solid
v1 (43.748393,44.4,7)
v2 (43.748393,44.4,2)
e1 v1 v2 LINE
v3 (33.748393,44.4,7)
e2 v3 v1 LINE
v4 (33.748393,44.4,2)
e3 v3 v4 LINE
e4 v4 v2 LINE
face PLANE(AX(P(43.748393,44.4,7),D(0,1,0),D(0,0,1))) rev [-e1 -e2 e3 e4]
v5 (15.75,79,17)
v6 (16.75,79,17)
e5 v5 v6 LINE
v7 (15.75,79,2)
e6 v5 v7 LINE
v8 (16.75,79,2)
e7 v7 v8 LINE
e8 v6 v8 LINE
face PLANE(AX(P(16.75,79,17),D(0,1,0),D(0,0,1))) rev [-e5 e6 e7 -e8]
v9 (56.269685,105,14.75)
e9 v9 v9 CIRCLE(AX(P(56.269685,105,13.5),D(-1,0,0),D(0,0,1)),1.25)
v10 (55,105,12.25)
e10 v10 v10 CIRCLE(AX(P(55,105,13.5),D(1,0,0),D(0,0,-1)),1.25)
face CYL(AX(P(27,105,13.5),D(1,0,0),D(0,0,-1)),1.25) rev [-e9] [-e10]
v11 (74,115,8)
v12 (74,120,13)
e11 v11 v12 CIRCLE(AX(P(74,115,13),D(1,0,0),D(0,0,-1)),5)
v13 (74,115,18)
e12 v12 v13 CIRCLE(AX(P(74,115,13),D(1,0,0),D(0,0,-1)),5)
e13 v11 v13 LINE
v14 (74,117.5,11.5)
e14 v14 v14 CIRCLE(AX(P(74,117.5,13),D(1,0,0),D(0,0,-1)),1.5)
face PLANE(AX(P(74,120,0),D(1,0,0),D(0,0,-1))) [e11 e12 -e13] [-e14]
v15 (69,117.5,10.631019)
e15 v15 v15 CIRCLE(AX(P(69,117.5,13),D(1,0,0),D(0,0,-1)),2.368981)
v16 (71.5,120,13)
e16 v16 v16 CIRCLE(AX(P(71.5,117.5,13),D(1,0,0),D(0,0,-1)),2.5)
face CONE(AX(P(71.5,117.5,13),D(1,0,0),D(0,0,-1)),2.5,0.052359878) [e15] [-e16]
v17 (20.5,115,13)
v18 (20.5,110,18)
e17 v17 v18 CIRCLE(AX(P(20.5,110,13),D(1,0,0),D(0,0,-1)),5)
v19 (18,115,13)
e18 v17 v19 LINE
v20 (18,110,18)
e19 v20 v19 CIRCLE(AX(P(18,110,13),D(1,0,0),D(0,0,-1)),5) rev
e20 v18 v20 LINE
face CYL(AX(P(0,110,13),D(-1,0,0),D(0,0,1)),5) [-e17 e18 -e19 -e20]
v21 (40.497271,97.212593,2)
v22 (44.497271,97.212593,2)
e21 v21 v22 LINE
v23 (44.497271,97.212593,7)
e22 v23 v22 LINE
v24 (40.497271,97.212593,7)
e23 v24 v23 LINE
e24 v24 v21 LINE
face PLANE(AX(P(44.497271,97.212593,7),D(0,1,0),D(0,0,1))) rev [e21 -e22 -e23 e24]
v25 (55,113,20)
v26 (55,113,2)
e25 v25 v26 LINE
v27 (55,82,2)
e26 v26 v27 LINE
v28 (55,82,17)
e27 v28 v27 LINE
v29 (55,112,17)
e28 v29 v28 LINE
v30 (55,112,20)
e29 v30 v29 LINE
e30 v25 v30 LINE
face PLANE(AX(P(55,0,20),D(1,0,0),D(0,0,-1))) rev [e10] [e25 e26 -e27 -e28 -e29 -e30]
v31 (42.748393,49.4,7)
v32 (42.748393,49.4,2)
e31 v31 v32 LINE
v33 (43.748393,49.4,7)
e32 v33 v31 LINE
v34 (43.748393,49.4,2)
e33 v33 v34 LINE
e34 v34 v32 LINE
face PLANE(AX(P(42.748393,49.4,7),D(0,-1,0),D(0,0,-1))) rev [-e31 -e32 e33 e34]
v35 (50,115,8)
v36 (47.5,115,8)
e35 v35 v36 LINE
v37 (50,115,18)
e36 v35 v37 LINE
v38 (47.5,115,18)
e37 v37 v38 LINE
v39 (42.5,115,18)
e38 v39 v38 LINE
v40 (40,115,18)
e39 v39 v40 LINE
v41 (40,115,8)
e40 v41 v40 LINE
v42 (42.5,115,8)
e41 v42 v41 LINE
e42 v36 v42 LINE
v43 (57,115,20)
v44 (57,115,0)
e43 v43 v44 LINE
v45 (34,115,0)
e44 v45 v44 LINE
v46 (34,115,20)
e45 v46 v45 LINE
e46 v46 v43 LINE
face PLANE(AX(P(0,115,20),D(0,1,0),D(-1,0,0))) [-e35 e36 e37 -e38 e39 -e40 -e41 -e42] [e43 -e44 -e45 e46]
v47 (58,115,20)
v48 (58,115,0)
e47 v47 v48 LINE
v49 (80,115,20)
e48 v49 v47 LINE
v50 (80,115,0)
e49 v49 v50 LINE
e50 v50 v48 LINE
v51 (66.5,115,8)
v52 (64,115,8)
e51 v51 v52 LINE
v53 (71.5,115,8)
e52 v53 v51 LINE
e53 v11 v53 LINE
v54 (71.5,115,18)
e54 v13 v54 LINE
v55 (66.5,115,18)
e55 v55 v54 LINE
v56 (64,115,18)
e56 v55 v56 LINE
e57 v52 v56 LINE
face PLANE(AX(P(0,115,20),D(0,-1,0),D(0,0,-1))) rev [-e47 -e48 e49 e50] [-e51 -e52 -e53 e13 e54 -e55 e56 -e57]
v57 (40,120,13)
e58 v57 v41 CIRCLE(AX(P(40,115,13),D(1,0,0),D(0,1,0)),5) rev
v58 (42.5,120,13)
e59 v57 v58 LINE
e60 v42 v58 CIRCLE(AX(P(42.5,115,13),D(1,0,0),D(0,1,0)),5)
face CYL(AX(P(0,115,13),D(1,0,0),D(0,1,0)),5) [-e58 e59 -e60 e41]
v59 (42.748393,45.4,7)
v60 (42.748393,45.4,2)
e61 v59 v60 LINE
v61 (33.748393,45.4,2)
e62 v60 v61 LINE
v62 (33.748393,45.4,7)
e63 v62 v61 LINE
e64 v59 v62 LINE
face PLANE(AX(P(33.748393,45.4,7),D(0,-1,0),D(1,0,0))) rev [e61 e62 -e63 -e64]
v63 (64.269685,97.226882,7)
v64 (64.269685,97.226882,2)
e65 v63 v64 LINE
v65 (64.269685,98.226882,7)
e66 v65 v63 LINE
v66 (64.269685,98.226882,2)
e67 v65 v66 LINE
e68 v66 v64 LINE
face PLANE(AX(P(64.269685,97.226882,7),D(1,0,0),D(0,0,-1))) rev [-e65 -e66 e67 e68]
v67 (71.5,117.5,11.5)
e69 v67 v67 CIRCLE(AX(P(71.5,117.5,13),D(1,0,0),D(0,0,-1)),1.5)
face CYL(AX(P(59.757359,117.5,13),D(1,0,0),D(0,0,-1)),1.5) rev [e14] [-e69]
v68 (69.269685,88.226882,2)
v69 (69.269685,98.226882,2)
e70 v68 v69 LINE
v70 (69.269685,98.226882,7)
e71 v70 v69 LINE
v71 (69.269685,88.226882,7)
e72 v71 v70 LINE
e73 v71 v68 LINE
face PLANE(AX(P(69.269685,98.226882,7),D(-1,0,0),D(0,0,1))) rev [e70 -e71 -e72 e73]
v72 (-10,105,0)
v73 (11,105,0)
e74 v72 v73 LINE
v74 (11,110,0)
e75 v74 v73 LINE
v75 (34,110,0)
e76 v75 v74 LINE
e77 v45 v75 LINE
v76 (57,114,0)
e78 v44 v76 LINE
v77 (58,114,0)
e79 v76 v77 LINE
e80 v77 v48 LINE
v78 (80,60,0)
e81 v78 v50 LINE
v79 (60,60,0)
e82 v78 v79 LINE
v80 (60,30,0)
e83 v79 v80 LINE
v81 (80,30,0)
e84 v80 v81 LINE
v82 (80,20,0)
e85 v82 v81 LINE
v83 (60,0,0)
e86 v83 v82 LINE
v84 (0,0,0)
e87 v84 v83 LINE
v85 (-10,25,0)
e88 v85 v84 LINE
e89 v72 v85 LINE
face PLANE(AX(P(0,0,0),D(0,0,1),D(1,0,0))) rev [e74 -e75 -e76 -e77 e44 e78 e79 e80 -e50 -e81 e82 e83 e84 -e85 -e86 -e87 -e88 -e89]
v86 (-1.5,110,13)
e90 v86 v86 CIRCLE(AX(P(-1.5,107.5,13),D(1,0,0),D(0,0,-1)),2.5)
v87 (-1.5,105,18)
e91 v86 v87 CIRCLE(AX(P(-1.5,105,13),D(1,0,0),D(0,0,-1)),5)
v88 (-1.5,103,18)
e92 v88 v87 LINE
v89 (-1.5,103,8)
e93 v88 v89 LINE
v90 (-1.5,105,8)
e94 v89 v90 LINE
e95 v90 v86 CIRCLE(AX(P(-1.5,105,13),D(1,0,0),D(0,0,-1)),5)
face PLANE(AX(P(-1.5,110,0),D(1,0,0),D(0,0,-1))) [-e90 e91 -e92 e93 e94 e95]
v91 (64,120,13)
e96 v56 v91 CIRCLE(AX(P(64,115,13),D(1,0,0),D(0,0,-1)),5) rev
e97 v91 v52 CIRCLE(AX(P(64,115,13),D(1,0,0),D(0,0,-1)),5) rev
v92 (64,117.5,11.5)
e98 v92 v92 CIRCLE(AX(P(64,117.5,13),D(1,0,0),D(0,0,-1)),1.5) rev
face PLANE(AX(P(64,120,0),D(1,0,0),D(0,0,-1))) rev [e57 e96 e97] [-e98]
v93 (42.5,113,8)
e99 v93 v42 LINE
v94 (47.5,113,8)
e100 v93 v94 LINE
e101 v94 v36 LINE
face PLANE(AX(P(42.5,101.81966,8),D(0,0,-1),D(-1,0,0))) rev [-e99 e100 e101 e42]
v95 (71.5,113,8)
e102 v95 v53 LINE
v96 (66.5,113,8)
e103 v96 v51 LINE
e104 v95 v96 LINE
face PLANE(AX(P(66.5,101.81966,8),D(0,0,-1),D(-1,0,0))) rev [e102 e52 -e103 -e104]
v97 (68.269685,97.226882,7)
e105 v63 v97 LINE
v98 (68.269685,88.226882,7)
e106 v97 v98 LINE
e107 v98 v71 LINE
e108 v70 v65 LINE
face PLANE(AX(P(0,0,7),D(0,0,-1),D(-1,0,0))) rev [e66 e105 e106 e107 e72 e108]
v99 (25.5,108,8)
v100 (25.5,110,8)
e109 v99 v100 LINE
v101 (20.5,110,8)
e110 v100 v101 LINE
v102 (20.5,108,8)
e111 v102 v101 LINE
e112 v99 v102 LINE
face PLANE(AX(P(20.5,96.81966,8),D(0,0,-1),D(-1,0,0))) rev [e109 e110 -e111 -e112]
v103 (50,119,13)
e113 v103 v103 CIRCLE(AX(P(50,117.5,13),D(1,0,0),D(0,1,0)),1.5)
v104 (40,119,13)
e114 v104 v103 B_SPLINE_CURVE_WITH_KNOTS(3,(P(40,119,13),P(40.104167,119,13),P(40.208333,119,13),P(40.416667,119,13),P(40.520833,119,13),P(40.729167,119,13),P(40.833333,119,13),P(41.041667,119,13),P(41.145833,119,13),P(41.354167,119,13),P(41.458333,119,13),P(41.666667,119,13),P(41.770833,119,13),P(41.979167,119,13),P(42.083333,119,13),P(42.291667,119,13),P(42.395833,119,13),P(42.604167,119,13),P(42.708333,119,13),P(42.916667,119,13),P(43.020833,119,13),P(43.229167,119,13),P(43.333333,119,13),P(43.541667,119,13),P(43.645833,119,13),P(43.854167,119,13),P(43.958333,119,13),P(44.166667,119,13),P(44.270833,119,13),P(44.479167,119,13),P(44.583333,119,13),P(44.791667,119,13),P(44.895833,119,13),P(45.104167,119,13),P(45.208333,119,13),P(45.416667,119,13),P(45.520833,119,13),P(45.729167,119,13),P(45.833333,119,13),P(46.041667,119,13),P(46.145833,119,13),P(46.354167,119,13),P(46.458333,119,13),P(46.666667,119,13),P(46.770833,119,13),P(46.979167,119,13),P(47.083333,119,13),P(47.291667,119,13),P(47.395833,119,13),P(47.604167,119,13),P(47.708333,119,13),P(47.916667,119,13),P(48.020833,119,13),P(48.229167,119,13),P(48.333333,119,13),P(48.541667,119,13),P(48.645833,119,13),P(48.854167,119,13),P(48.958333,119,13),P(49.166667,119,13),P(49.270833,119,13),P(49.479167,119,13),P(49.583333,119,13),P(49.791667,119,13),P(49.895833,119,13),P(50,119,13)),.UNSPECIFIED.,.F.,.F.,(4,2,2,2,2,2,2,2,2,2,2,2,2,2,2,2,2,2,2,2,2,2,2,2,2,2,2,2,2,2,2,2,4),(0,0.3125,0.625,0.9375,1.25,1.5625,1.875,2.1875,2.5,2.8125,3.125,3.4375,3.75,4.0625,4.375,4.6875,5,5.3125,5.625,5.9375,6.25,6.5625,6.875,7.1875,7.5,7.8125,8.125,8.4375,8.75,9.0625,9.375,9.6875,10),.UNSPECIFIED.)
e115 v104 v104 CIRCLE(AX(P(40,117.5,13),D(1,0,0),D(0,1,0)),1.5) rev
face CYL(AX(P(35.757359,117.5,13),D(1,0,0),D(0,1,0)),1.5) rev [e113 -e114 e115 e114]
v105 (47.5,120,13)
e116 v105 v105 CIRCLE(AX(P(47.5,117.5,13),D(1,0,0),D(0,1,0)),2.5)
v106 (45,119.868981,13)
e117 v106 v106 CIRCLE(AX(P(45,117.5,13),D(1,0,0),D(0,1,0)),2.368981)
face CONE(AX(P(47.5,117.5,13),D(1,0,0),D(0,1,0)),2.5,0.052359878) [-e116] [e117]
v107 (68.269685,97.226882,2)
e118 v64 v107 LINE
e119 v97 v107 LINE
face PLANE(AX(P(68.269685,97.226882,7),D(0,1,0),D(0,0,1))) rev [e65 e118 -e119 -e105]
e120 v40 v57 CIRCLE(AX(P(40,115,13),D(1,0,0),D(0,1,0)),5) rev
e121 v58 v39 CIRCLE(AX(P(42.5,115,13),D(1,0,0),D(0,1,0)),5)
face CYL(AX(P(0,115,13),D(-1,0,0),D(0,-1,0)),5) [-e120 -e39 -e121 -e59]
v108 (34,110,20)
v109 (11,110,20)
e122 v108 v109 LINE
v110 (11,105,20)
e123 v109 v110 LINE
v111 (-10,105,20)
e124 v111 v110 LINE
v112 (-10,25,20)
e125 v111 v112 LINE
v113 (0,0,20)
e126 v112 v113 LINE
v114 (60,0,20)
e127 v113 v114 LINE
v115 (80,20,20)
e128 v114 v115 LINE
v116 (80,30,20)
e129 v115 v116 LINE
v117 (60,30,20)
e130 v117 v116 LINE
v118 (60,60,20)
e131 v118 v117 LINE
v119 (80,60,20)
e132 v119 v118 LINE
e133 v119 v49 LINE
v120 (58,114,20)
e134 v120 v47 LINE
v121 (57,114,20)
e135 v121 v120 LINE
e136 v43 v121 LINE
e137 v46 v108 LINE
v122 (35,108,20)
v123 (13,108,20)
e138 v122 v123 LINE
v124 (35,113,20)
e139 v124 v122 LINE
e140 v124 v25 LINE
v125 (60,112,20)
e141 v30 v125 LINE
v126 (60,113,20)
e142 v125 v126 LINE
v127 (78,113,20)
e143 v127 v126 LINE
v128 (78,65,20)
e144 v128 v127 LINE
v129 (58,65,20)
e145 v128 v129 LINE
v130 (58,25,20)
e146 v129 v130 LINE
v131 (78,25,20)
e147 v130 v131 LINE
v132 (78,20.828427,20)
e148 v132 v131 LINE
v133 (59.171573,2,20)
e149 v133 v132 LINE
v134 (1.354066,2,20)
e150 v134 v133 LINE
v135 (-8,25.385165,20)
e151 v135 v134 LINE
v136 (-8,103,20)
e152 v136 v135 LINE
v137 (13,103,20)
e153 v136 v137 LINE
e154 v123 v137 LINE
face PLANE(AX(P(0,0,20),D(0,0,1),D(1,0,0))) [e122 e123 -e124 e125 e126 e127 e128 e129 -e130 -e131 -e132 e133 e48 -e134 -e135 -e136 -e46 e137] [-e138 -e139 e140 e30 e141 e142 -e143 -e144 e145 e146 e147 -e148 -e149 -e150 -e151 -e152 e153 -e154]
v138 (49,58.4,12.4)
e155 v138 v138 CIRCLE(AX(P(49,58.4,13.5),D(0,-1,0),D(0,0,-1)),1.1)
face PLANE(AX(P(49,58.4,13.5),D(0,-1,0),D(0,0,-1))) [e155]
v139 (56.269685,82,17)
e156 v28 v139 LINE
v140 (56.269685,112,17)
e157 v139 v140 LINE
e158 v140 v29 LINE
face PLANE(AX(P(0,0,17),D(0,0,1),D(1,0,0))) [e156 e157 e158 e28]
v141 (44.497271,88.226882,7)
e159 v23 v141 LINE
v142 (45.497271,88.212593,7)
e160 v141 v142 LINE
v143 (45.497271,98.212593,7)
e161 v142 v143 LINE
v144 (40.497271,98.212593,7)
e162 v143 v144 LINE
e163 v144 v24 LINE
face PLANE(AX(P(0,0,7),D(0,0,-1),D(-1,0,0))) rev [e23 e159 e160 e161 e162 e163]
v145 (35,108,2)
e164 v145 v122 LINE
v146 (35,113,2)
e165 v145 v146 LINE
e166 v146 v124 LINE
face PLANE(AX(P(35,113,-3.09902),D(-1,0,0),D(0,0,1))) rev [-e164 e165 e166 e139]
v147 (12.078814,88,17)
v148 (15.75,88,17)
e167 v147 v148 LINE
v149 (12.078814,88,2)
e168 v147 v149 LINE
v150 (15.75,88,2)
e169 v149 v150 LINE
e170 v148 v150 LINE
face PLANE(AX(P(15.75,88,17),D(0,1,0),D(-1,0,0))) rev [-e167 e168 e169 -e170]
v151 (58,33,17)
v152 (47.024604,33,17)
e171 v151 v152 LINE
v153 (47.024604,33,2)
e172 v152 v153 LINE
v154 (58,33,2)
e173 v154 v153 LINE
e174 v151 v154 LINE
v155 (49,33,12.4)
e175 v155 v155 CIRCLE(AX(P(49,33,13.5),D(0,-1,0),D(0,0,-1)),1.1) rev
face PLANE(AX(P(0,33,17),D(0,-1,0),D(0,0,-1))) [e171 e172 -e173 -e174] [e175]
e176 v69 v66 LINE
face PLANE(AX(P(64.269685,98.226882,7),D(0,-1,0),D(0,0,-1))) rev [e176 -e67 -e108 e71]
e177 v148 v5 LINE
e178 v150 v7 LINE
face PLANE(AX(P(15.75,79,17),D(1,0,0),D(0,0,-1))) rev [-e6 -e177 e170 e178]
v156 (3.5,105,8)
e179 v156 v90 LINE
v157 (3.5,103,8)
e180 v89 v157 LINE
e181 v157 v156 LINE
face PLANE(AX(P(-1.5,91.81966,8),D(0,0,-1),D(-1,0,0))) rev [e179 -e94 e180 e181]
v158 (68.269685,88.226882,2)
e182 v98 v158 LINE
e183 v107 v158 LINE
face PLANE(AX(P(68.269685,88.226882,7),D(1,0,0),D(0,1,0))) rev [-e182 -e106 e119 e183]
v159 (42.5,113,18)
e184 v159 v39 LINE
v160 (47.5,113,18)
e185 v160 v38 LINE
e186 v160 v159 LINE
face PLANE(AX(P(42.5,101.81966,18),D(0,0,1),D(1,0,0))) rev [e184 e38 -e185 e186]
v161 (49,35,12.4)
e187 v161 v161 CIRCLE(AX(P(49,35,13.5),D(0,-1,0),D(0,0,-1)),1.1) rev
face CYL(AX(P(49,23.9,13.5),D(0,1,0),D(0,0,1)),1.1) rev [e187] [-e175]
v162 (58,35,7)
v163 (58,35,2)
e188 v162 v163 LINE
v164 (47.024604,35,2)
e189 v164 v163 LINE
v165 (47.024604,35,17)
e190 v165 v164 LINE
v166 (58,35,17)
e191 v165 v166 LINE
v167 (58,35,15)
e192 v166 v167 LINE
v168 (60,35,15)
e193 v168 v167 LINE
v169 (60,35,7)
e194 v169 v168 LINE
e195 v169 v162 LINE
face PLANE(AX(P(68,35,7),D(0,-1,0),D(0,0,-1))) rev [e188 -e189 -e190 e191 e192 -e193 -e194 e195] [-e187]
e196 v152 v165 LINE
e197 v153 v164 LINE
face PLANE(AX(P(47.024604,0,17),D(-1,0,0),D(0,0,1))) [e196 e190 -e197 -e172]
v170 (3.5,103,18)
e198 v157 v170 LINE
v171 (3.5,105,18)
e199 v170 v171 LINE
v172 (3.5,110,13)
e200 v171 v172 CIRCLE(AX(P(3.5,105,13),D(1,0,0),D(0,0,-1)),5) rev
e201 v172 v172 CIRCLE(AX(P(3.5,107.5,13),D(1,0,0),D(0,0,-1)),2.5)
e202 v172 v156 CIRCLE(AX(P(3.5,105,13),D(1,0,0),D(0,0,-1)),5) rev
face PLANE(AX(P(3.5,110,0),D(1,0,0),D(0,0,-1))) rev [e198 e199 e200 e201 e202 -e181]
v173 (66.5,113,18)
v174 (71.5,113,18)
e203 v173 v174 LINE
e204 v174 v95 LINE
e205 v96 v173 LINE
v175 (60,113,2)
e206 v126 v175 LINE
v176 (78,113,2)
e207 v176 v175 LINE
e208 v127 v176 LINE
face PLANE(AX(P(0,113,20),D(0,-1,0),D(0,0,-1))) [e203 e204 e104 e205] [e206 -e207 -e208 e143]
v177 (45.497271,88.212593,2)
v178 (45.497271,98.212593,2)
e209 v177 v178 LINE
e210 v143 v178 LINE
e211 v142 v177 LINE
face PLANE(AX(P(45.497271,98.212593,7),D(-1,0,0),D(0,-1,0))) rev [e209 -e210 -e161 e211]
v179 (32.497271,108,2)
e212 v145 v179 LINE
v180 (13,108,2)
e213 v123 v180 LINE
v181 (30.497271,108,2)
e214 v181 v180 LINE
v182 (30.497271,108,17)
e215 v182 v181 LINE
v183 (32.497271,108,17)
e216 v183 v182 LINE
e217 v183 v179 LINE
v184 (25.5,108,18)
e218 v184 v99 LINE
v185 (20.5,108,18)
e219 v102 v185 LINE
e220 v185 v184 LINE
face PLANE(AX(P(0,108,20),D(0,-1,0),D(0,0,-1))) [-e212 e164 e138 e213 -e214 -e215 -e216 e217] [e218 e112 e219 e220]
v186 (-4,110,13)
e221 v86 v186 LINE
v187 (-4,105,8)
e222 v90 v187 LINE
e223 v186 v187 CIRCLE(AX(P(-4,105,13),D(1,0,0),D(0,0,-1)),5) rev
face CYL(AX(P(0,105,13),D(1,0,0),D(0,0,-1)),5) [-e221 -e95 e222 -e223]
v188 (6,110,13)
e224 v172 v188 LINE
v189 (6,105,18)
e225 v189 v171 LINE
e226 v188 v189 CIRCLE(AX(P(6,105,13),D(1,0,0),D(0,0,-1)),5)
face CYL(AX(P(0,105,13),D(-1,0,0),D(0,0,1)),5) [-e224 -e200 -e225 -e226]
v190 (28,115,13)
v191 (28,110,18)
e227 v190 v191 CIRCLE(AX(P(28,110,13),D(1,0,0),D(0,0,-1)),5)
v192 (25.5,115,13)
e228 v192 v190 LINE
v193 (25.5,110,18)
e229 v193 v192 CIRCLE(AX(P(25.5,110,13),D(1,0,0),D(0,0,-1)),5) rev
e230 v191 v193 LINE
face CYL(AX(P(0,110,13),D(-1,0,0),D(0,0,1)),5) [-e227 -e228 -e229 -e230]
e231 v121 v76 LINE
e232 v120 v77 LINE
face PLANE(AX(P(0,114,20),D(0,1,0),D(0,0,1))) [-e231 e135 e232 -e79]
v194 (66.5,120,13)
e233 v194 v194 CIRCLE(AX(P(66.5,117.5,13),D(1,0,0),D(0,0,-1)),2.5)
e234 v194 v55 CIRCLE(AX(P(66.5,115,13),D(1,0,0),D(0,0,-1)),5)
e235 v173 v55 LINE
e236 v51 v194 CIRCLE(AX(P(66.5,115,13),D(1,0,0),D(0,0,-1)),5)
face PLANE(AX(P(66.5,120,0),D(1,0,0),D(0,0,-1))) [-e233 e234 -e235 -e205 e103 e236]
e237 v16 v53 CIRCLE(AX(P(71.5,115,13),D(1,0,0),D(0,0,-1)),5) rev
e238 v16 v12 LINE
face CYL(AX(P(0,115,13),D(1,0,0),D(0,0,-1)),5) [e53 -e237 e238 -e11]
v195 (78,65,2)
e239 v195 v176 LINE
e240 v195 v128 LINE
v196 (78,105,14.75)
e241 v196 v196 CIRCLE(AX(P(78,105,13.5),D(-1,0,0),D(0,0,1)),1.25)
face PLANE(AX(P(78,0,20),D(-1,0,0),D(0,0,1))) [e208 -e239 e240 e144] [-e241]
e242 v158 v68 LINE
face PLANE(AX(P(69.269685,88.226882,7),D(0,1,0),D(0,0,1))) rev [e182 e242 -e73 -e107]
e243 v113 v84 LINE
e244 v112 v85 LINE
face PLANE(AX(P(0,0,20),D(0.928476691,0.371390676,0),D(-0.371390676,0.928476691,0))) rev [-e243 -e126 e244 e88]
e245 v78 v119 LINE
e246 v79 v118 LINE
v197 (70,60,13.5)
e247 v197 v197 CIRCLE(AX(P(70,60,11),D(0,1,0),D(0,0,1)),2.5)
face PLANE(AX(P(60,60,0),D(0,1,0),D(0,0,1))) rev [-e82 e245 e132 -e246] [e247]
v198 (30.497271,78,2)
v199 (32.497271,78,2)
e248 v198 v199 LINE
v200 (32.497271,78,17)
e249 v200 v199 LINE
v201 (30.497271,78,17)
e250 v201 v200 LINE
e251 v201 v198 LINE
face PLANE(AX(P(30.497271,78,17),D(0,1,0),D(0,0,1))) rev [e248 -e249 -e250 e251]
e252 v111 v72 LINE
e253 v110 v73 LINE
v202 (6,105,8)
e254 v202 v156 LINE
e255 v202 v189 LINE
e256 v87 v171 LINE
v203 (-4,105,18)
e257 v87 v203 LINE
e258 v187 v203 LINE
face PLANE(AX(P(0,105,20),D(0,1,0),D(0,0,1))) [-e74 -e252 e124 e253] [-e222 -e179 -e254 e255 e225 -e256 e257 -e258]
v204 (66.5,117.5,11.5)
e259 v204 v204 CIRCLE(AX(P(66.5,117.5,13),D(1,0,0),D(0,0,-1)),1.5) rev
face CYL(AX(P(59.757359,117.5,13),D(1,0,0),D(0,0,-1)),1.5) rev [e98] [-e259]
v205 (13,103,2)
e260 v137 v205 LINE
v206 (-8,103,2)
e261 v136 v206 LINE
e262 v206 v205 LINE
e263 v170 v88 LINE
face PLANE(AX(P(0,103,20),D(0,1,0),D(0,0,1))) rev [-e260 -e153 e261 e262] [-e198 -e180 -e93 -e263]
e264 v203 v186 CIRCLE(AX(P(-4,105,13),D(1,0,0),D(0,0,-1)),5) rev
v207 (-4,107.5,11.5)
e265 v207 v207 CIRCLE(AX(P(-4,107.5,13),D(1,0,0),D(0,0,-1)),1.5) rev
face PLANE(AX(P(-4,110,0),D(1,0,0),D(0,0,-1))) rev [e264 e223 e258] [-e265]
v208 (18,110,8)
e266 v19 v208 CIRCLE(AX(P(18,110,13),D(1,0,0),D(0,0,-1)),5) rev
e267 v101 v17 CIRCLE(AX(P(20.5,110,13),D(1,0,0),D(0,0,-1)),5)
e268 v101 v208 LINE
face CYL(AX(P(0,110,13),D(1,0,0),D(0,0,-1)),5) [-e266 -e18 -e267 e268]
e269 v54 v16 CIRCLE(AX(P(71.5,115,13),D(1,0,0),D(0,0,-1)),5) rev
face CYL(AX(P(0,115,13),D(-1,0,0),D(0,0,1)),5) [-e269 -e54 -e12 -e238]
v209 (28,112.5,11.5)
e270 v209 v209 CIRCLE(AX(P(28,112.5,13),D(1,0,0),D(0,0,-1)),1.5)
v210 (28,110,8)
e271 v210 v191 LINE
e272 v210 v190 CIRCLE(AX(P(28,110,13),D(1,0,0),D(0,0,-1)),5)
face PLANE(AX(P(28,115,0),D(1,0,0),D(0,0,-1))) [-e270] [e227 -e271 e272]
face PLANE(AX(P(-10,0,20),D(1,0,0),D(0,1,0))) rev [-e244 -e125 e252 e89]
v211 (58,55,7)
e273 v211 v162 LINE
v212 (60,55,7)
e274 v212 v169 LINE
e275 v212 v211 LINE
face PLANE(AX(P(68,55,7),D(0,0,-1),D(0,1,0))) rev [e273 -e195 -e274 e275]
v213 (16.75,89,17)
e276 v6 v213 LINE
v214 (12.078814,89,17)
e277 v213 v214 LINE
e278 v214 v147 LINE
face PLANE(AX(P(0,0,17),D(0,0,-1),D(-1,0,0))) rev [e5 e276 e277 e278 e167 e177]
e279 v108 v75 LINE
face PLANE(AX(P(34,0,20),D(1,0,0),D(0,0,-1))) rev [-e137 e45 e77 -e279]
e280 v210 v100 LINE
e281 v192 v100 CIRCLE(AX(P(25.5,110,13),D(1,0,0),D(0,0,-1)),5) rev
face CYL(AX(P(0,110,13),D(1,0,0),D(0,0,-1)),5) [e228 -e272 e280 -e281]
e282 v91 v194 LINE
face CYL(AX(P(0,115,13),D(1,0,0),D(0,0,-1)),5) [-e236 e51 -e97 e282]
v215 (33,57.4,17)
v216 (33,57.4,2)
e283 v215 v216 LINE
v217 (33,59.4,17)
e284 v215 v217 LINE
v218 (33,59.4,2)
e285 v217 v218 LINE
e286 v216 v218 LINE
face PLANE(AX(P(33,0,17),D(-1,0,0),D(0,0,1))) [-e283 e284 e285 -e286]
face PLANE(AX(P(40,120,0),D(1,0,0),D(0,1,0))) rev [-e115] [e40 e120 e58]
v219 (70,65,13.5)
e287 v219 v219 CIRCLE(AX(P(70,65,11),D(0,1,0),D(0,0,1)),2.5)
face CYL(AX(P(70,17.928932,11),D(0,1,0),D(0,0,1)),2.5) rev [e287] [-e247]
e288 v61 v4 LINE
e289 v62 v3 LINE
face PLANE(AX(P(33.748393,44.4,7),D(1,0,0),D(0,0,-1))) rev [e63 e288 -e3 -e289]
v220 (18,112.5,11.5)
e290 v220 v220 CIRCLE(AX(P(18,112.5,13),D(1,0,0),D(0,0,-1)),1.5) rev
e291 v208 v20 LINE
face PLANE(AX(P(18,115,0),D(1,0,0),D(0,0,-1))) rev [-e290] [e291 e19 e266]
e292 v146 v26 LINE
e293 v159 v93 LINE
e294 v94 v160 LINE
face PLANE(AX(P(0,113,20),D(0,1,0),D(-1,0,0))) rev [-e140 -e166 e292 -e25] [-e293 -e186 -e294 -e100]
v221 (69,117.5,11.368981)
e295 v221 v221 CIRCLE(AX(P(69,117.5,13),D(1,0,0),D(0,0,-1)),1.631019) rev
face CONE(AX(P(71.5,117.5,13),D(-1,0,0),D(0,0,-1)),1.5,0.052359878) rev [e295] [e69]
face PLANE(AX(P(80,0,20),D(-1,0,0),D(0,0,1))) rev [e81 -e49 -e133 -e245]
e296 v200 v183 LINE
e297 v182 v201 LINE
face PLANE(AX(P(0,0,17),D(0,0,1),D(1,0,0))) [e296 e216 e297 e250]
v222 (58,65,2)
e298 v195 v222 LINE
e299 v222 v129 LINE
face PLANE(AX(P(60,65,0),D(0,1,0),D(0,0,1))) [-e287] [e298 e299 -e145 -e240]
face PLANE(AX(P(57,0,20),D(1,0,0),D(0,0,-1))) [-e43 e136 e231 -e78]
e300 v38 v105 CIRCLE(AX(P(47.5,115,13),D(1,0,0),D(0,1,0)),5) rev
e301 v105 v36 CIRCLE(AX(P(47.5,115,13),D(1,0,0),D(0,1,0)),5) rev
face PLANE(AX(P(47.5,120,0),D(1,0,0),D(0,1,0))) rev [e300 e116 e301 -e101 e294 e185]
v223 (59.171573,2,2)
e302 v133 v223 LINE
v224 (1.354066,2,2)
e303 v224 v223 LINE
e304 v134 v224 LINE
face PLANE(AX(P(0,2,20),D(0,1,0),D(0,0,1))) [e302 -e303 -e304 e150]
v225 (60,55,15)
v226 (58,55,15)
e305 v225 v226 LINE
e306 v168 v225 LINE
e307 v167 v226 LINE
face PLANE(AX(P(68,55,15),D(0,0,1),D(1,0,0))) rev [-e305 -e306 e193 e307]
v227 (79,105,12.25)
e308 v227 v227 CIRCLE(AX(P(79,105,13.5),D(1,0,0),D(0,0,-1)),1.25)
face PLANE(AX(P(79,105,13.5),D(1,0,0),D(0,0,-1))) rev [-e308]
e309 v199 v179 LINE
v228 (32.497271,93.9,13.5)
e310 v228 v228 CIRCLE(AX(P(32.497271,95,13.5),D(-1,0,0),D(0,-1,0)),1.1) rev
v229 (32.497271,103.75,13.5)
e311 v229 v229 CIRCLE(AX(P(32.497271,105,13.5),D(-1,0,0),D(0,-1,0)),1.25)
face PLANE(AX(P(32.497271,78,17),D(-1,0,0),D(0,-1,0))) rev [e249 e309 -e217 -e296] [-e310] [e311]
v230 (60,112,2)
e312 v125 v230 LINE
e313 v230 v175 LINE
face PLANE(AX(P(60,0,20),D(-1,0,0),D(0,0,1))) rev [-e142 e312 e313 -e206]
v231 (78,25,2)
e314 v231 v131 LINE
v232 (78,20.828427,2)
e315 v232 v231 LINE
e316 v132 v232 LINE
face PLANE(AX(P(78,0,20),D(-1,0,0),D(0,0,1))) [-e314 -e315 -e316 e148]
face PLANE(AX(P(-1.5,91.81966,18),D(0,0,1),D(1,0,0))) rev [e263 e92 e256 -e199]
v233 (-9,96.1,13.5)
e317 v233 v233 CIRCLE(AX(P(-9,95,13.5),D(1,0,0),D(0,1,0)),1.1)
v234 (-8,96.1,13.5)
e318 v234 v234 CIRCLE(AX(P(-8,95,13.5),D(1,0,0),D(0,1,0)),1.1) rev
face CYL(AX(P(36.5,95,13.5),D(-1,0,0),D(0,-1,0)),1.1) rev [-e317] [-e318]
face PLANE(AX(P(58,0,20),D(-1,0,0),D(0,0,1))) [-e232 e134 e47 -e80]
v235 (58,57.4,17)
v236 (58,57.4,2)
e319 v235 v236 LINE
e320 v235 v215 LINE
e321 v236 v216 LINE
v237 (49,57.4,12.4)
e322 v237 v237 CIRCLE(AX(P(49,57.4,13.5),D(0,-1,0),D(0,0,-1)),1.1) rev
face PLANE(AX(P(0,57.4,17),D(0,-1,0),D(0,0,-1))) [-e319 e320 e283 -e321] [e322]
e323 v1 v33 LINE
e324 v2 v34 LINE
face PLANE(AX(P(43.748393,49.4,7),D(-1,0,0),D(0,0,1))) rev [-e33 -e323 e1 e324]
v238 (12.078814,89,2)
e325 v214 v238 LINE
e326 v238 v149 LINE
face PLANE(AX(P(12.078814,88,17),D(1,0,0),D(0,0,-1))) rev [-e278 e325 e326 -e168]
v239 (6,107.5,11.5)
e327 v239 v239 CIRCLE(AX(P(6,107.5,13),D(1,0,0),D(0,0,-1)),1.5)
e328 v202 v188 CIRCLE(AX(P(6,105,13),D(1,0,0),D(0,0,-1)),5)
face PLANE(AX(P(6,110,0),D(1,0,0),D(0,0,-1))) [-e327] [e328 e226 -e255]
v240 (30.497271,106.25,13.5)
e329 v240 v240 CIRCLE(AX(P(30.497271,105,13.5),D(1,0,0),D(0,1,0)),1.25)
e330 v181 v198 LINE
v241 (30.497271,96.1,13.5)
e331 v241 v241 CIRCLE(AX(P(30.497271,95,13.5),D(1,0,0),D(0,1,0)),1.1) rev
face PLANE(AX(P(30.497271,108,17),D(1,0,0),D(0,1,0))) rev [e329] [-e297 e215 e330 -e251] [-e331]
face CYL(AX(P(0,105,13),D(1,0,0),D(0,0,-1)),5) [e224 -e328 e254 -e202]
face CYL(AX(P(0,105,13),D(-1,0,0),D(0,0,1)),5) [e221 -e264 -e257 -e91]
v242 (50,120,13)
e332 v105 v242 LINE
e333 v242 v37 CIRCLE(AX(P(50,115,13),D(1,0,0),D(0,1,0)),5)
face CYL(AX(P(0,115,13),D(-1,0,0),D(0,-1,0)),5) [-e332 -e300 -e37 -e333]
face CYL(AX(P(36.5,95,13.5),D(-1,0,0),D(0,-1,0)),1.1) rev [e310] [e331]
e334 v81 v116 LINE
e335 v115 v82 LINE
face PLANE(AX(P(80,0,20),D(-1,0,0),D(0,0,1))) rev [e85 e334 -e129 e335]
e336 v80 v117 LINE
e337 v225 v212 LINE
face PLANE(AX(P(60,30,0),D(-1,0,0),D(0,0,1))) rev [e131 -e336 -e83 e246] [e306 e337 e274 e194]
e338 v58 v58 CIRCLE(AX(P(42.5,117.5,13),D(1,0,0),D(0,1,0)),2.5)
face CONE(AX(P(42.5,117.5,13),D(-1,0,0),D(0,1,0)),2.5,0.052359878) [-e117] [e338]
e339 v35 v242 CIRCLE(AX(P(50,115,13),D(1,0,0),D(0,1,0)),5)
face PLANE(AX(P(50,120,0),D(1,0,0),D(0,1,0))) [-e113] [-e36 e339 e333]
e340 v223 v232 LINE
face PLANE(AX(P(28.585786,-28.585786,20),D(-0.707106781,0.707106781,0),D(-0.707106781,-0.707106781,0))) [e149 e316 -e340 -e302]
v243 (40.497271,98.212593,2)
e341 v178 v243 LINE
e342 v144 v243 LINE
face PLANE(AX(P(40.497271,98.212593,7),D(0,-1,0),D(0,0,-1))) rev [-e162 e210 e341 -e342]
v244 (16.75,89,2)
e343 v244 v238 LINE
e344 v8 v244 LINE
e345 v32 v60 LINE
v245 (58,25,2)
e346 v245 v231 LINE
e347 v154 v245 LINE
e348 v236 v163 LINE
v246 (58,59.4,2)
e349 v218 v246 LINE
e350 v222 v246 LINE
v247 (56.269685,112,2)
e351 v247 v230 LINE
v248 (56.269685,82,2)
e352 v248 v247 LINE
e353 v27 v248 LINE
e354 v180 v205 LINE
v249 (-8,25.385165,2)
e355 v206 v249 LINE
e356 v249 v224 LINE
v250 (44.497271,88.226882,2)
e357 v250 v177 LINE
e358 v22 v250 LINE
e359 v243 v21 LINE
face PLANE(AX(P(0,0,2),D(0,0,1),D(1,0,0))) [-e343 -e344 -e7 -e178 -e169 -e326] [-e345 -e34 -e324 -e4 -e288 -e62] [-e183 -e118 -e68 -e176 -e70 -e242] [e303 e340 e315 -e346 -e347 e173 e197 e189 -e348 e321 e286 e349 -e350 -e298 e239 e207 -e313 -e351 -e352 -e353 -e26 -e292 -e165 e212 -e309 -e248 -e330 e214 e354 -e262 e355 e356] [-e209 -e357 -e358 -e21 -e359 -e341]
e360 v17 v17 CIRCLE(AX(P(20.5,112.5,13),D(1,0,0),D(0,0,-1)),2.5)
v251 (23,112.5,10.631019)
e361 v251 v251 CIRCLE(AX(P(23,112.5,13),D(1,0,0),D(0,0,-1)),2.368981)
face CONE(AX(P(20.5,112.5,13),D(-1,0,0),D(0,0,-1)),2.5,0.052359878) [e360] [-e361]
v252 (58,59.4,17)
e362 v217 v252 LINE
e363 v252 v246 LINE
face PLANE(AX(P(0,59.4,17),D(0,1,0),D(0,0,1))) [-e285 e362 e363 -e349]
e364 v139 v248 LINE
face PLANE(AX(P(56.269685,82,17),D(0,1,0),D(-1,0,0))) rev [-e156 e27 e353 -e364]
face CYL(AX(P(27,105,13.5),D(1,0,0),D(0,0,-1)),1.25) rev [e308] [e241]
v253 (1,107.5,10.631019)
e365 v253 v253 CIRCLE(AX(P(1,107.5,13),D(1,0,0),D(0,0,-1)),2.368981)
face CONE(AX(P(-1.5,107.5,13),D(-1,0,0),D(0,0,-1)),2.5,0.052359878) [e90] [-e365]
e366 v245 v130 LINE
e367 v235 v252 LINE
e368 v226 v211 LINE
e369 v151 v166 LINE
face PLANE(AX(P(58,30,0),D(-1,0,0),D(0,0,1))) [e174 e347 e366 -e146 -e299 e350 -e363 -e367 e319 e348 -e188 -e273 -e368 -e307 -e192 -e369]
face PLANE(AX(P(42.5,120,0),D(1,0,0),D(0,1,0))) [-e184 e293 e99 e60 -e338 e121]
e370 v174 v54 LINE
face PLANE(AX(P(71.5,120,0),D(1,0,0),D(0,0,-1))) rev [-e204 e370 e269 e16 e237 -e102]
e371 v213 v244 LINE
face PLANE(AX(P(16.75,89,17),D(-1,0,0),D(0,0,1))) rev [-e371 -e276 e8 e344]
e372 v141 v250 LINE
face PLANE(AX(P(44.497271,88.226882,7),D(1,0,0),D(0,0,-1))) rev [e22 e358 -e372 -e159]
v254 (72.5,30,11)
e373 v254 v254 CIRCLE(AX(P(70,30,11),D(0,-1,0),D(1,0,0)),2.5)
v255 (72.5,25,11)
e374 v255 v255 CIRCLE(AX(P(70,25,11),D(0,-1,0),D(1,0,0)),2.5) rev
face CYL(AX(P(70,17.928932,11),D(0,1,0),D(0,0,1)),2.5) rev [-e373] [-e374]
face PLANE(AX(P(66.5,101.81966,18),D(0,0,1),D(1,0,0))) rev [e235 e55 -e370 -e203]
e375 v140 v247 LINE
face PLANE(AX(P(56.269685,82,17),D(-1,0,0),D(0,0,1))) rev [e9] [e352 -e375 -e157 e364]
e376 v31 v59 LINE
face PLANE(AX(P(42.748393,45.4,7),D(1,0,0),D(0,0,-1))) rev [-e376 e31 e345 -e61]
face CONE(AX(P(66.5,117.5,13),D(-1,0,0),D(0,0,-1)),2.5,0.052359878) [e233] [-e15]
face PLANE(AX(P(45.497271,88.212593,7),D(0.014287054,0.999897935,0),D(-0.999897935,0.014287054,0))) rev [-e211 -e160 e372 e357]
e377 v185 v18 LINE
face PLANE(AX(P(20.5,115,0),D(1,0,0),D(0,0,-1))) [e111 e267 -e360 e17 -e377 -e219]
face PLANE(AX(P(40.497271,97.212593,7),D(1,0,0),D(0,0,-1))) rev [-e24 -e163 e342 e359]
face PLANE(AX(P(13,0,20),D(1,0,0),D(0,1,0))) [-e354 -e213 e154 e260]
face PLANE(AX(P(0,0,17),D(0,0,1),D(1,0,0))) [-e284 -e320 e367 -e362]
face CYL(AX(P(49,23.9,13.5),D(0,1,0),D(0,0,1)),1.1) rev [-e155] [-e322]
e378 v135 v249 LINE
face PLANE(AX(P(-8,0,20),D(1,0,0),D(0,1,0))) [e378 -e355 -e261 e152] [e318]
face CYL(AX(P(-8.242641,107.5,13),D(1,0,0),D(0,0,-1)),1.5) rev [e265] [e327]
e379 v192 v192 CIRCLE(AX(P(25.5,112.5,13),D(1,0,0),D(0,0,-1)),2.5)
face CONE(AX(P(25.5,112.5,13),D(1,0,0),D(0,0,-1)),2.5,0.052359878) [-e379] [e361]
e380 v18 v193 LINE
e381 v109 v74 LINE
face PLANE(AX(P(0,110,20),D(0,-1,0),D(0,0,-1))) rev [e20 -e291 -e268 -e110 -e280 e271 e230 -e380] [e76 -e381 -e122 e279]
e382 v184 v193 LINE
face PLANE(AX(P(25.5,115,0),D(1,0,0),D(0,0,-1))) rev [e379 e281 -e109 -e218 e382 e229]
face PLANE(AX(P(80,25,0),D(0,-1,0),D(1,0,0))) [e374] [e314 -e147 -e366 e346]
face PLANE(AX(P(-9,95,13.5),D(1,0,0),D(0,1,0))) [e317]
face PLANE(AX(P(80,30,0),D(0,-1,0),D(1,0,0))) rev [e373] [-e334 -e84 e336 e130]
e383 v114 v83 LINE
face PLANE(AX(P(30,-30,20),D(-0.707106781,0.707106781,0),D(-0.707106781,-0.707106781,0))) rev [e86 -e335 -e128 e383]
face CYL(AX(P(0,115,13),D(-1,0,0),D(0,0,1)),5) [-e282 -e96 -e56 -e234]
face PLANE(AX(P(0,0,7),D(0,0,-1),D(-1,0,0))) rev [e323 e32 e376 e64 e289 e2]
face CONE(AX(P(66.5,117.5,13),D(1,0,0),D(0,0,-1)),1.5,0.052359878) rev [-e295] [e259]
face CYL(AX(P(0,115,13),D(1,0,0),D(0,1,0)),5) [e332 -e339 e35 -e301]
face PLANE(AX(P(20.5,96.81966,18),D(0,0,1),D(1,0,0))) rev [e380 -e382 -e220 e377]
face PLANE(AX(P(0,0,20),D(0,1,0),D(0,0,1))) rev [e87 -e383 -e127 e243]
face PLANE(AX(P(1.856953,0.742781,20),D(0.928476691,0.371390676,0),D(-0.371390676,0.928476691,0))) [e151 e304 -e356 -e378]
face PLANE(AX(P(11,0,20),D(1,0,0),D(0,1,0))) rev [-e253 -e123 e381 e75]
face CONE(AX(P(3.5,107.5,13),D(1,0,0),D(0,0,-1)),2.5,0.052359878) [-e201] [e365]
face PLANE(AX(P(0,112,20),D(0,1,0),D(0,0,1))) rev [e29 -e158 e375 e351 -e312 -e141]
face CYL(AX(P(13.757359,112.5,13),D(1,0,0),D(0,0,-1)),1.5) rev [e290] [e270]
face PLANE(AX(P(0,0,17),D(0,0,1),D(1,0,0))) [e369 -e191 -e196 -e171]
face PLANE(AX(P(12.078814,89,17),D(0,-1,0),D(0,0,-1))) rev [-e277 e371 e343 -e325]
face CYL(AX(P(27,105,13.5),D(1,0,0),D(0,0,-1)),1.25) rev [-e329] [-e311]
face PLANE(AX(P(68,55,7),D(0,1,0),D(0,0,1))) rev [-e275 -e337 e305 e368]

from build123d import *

# Parameters (mm, degrees)
BOSS_EXTRUDE1_DEPTH       = 20
SKETCH2_W                 = 20
SKETCH2_H                 = 30
CUT_EXTRUDE1_DEPTH        = 142.509716981
SHELL1_T                  = -2
SHELL1_THICKNESS_2_FACE_W = 20
SHELL1_THICKNESS_2_FACE_H = 18
SHELL1_THICKNESS_2_DEPTH  = 3
SHELL1_THICKNESS_3_FACE_W = 18
SHELL1_THICKNESS_3_FACE_H = 20
SHELL1_THICKNESS_3_DEPTH  = 3
SKETCH42_W                = 1.26968537
SKETCH42_H                = 30
BOSS_EXTRUDE16_DEPTH      = 15
SKETCH45_W                = 2
SKETCH45_H                = 30
BOSS_EXTRUDE17_DEPTH      = 15
CUT_EXTRUDE15_DEPTH       = 1
CUT_EXTRUDE15_DEPTH_BACK  = 51
SKETCH40_R                = 1.25
SKETCH41_W                = 8
SKETCH41_H                = 20
CUT_EXTRUDE16_DEPTH       = 10
SKETCH44_W                = 1
SKETCH44_H                = 5
CUT_EXTRUDE18_DEPTH       = 18
BOSS_EXTRUDE18_DEPTH      = 15
CUT_EXTRUDE19_DEPTH       = 44.5
CUT_EXTRUDE19_DEPTH_BACK  = 1
SKETCH47_R                = 1.1
SKETCH50_W                = 25
SKETCH50_H                = 2
BOSS_EXTRUDE19_DEPTH      = 15
SKETCH51_W                = 10.975395667
SKETCH51_H                = 2
BOSS_EXTRUDE20_DEPTH      = 15
BOSS_EXTRUDE21_DEPTH      = 5
CUT_EXTRUDE21_DEPTH       = 33.5
CUT_EXTRUDE21_DEPTH_BACK  = 1
SKETCH53_R                = 1.1
CUT_EXTRUDE14_REACH       = 107
SKETCH34_R                = 2.5
SKETCH3_W                 = 2.5
SKETCH3_H                 = 10
BOSS_EXTRUDE2_DEPTH       = 5
FILLET2_R                 = 5
CUT_EXTRUDE3_REACH        = 149.838
SKETCH6_R                 = 1.5
SKETCH21_R                = 2.5
SKETCH21_R_2              = 1.5
BOSS_EXTRUDE10_DEPTH      = 2.5
BOSS_EXTRUDE10_DRAFT      = 3
MIRROR7_COPY_1_SKETCH_R   = 2.5
MIRROR7_COPY_1_SKETCH_R_2 = 1.5
MIRROR7_COPY_1_DEPTH      = 2.5
MIRROR7_COPY_1_DRAFT      = 3
SKETCH26_W                = 5
SKETCH26_H                = 10
CUT_EXTRUDE8_DEPTH        = 2
SKETCH7_W                 = 2.5
SKETCH7_H                 = 10
BOSS_EXTRUDE4_DEPTH       = 5
FILLET4_R                 = 5
SKETCH22_R                = 2.5
BOSS_EXTRUDE11_DEPTH      = 2.5
BOSS_EXTRUDE11_TAPER      = 3
SKETCH23_R                = 1.5
CUT_EXTRUDE7_DEPTH        = 10
CUT_EXTRUDE9_REACH        = 143.51
SKETCH27_W                = 5
SKETCH27_H                = 10
SKETCH10_W                = 2.5
SKETCH10_H                = 10
BOSS_EXTRUDE6_DEPTH       = 5
FILLET6_R                 = 5
SKETCH28_R                = 2.5
BOSS_EXTRUDE12_DEPTH      = 2.5
BOSS_EXTRUDE12_TAPER      = 3
SKETCH29_R                = 1.5
CUT_EXTRUDE10_DEPTH       = 10
SKETCH30_W                = 5
SKETCH30_H                = 10
CUT_EXTRUDE11_DEPTH       = 2
SKETCH13_W                = 2.5
SKETCH13_H                = 10
BOSS_EXTRUDE8_DEPTH       = 5
FILLET8_R                 = 5
SKETCH31_R                = 2.5
BOSS_EXTRUDE13_DEPTH      = 2.5
BOSS_EXTRUDE13_TAPER      = 3
SKETCH32_R                = 1.5
CUT_EXTRUDE12_DEPTH       = 10
SKETCH33_W                = 5
SKETCH33_H                = 10
CUT_EXTRUDE13_DEPTH       = 2


with BuildPart() as part:
    # Sketch1 → Boss-Extrude1 (new body)
    with BuildSketch(Plane.XY):
        Polygon((58, 114), (58, 115), (80, 115), (80, 20), (60, 0), (0, 0), (-10, 25), (-10, 105), (11, 105), (11, 110), (12, 110), (34, 110), (34, 115), (35, 115), (57, 115), (57, 114), align=None)
    extrude(amount=BOSS_EXTRUDE1_DEPTH)

    # Sketch2 → Cut-Extrude1 (cut, through all)
    with BuildSketch(Plane.XY.offset(20)):
        with Locations((70, 45)):
            Rectangle(SKETCH2_W, SKETCH2_H)
    extrude(amount=-CUT_EXTRUDE1_DEPTH, mode=Mode.SUBTRACT)

    # Shell1
    shell1_openings = [part.faces().sort_by_distance(p)[0] for p in [
        (33.373630802, 58.203978459, 20),
    ]]
    offset(amount=SHELL1_T, openings=shell1_openings, kind=Kind.INTERSECTION)

    # Shell1 thickness 2 face (on inner face of the shell) → Shell1 thickness 2 (add)
    with BuildSketch(Plane(origin=(68, 28, 11), x_dir=(1, 0, 0), z_dir=(0, 1, 0))):
        Rectangle(SHELL1_THICKNESS_2_FACE_W, SHELL1_THICKNESS_2_FACE_H)
    extrude(amount=-SHELL1_THICKNESS_2_DEPTH)

    # Shell1 thickness 3 face (on inner face of the shell) → Shell1 thickness 3 (add)
    with BuildSketch(Plane(origin=(68, 62, 11), x_dir=(0, 0, -1), z_dir=(0, -1, 0))):
        Rectangle(SHELL1_THICKNESS_3_FACE_W, SHELL1_THICKNESS_3_FACE_H)
    extrude(amount=-SHELL1_THICKNESS_3_DEPTH)

    # Sketch42 → Boss-Extrude16 (add)
    with BuildSketch(Plane.XY.offset(2)):
        with Locations((55.634842685, 97)):
            Rectangle(SKETCH42_W, SKETCH42_H)
    extrude(amount=BOSS_EXTRUDE16_DEPTH)

    # Sketch45 → Boss-Extrude17 (add)
    with BuildSketch(Plane.XY.offset(2)):
        with Locations((31.497271128, 93)):
            Rectangle(SKETCH45_W, SKETCH45_H)
    extrude(amount=BOSS_EXTRUDE17_DEPTH)

    # Sketch40 → Cut-Extrude15 (cut, two sides: drawn at the far end of the back side and taken through both)
    with BuildSketch(Plane(origin=(78, 0, 0), x_dir=(0, 0, -1), z_dir=(1, 0, 0)).offset(-CUT_EXTRUDE15_DEPTH_BACK)):
        with Locations(Location((-13.5, 105, 0), (0, 0, 90))):
            Circle(SKETCH40_R)
    extrude(amount=CUT_EXTRUDE15_DEPTH + CUT_EXTRUDE15_DEPTH_BACK, mode=Mode.SUBTRACT)

    # Sketch41 → Cut-Extrude16 (cut)
    with BuildSketch(Plane.ZY.offset(-58)):
        with Locations((11, 45)):
            Rectangle(SKETCH41_W, SKETCH41_H)
    extrude(amount=-CUT_EXTRUDE16_DEPTH, mode=Mode.SUBTRACT)

    # Sketch44 → Cut-Extrude18 (cut)
    with BuildSketch(Plane.XY.offset(20)):
        with Locations((35.5, 110.5)):
            Rectangle(SKETCH44_W, SKETCH44_H)
    extrude(amount=-CUT_EXTRUDE18_DEPTH, mode=Mode.SUBTRACT)

    # Sketch46 → Boss-Extrude18 (add)
    with BuildSketch(Plane.XY.offset(2)):
        Polygon((12.078813568, 88), (12.078813568, 89), (16.75, 89), (16.75, 79), (15.75, 79), (15.75, 88), align=None)
    extrude(amount=BOSS_EXTRUDE18_DEPTH)

    # Sketch47 → Cut-Extrude19 (cut, two sides: drawn at the far end of the back side and taken through both)
    with BuildSketch(Plane(origin=(-8, 0, 0), x_dir=(0, 0, -1), z_dir=(1, 0, 0)).offset(-CUT_EXTRUDE19_DEPTH_BACK)):
        with Locations(Location((-13.5, 95, 0), (0, 0, 270))):
            Circle(SKETCH47_R)
    extrude(amount=CUT_EXTRUDE19_DEPTH + CUT_EXTRUDE19_DEPTH_BACK, mode=Mode.SUBTRACT)

    # Sketch50 → Boss-Extrude19 (add)
    with BuildSketch(Plane.XY.offset(2)):
        with Locations((45.5, 58.4)):
            Rectangle(SKETCH50_W, SKETCH50_H)
    extrude(amount=BOSS_EXTRUDE19_DEPTH)

    # Sketch51 → Boss-Extrude20 (add)
    with BuildSketch(Plane.XY.offset(2)):
        with Locations((52.512302167, 34)):
            Rectangle(SKETCH51_W, SKETCH51_H)
    extrude(amount=BOSS_EXTRUDE20_DEPTH)

    # Sketch52 → Boss-Extrude21 (add)
    with BuildSketch(Plane.XY.offset(2)):
        Polygon((42.748392928, 49.4), (43.748392928, 49.4), (43.748392928, 44.4), (33.748392928, 44.4), (33.748392928, 45.4), (42.748392928, 45.4), align=None)
        Polygon((40.497271128, 97.212593004), (40.497271128, 98.212593004), (45.497271128, 98.212593004), (45.497271128, 88.212593004), (44.497271128, 88.226881517), (44.497271128, 97.212593004), align=None)
        Polygon((64.269685369, 97.226881517), (64.269685369, 98.226881517), (69.269685369, 98.226881517), (69.269685369, 88.226881517), (68.269685369, 88.226881517), (68.269685369, 97.226881517), align=None)
    extrude(amount=BOSS_EXTRUDE21_DEPTH)

    # Sketch53 → Cut-Extrude21 (cut, two sides: drawn at the far end of the back side and taken through both)
    with BuildSketch(Plane.XZ.offset(-57.4).offset(-CUT_EXTRUDE21_DEPTH_BACK)):
        with Locations(Location((49, 13.5, 0), (0, 0, 270))):
            Circle(SKETCH53_R)
    extrude(amount=CUT_EXTRUDE21_DEPTH + CUT_EXTRUDE21_DEPTH_BACK, mode=Mode.SUBTRACT)

    # Cut-Extrude14: up to this face of the body (flat: up to its plane)
    cut_extrude14_end = Plane(part.part.faces().sort_by_distance((68, 25, 11))[0])
    # Sketch34 → Cut-Extrude14 (cut, up to the picked face)
    with BuildSketch(Plane(origin=(0, 65, 0), x_dir=(1, 0, 0), z_dir=(0, 1, 0)), mode=Mode.PRIVATE) as cut_extrude14_sk1:
        with Locations(Location((70, -11, 0), (0, 0, 270))):
            Circle(SKETCH34_R)
    cut_extrude14_tool1 = split(extrude(cut_extrude14_sk1.sketch, amount=-CUT_EXTRUDE14_REACH, mode=Mode.PRIVATE), bisect_by=cut_extrude14_end, keep=Keep.BOTH, mode=Mode.PRIVATE)
    add(cut_extrude14_tool1.solids().sort_by(Axis((70, 65, 11), (0, -1, 0)))[0], mode=Mode.SUBTRACT)

    # Sketch3 → Boss-Extrude2 (add)
    with BuildSketch(Plane(origin=(0, 115, 0), x_dir=(1, 0, 0), z_dir=(0, 1, 0))):
        with Locations((65.25, -13)):
            Rectangle(SKETCH3_W, SKETCH3_H)
        with Locations((72.75, -13)):
            Rectangle(SKETCH3_W, SKETCH3_H)
    extrude(amount=BOSS_EXTRUDE2_DEPTH)

    # Fillet2
    fillet2_edges = [part.edges().sort_by_distance(p)[0] for p in [
        (65.25, 120, 8),
        (65.25, 120, 18),
        (72.75, 120, 8),
        (72.75, 120, 18),
    ]]
    fillet(fillet2_edges, radius=FILLET2_R - 0.0001)  # a hair under: the kernel refuses the full size

    # Cut-Extrude3: up to this face of the body (flat: up to its plane)
    cut_extrude3_end = Plane(part.part.faces().sort_by_distance((64, 117.122079053, 13))[0])
    # Sketch6 → Cut-Extrude3 (cut, up to the picked face)
    with BuildSketch(Plane(origin=(74, 0, 0), x_dir=(0, 0, -1), z_dir=(1, 0, 0)), mode=Mode.PRIVATE) as cut_extrude3_sk1:
        with Locations((-13, 117.5)):
            Circle(SKETCH6_R)
    cut_extrude3_tool1 = split(extrude(cut_extrude3_sk1.sketch, amount=-CUT_EXTRUDE3_REACH, mode=Mode.PRIVATE), bisect_by=cut_extrude3_end, keep=Keep.BOTH, mode=Mode.PRIVATE)
    add(cut_extrude3_tool1.solids().sort_by(Axis((74, 117.5, 13), (-1, 0, 0)))[0], mode=Mode.SUBTRACT)


with BuildPart() as boss_extrude10_tool:
    # Sketch21 → Boss-Extrude10 (with draft: the straight prism first)
    with BuildSketch(Plane(origin=(66.5, 0, 0), x_dir=(0, 0, -1), z_dir=(1, 0, 0))):
        with Locations((-13, 117.5)):
            Circle(SKETCH21_R)
        with Locations((-13, 117.5)):
            Circle(SKETCH21_R_2, mode=Mode.SUBTRACT)
    extrude(amount=BOSS_EXTRUDE10_DEPTH)
    # Boss-Extrude10: the draft: its side faces are tilted about the plane it starts from
    boss_extrude10_sides = [boss_extrude10_tool.faces().sort_by_distance(p)[0] for p in [
        (67.75, 117.5, 15.5),
        (67.75, 117.5, 14.5),
    ]]
    draft(boss_extrude10_sides, Plane(origin=(66.5, 0, 0), x_dir=(0, 0, -1), z_dir=(1, 0, 0)), BOSS_EXTRUDE10_DRAFT)


with BuildPart() as part_1:
    add(part.part)

    # Boss-Extrude10: add boss_extrude10_tool
    add(boss_extrude10_tool.part)


with BuildPart() as mirror7_copy_1_tool:
    # Mirror7 copy 1 sketch → Mirror7 copy 1 (with draft: the straight prism first)
    with BuildSketch(Plane(origin=(71.5, 0, 0), x_dir=(0, 0, -1), z_dir=(-1, 0, 0))):
        with Locations((-13, -117.5)):
            Circle(MIRROR7_COPY_1_SKETCH_R)
        with Locations((-13, -117.5)):
            Circle(MIRROR7_COPY_1_SKETCH_R_2, mode=Mode.SUBTRACT)
    extrude(amount=MIRROR7_COPY_1_DEPTH)
    # Mirror7 copy 1: the draft: its side faces are tilted about the plane it starts from
    mirror7_copy_1_sides = [mirror7_copy_1_tool.faces().sort_by_distance(p)[0] for p in [
        (70.25, 117.5, 15.5),
        (70.25, 117.5, 14.5),
    ]]
    draft(mirror7_copy_1_sides, Plane(origin=(71.5, 0, 0), x_dir=(0, 0, -1), z_dir=(-1, 0, 0)), MIRROR7_COPY_1_DRAFT)


with BuildPart() as part_2:
    add(part_1.part)

    # Mirror7 copy 1: add mirror7_copy_1_tool
    add(mirror7_copy_1_tool.part)

    # Sketch26 → Cut-Extrude8 (cut)
    with BuildSketch(Plane(origin=(0, 115, 0), x_dir=(1, 0, 0), z_dir=(0, 1, 0))):
        with Locations((69, -13)):
            Rectangle(SKETCH26_W, SKETCH26_H)
    extrude(amount=-CUT_EXTRUDE8_DEPTH, mode=Mode.SUBTRACT)

    # Sketch7 → Boss-Extrude4 (add)
    with BuildSketch(Plane(origin=(0, 115, 0), x_dir=(1, 0, 0), z_dir=(0, 1, 0))):
        with Locations((41.25, -13)):
            Rectangle(SKETCH7_W, SKETCH7_H)
        with Locations((48.75, -13)):
            Rectangle(SKETCH7_W, SKETCH7_H)
    extrude(amount=BOSS_EXTRUDE4_DEPTH)

    # Fillet4
    fillet4_edges = [part_2.edges().sort_by_distance(p)[0] for p in [
        (41.25, 120, 8),
        (41.25, 120, 18),
        (48.75, 120, 8),
        (48.75, 120, 18),
    ]]
    fillet(fillet4_edges, radius=FILLET4_R - 0.0001)  # a hair under: the kernel refuses the full size

    # Sketch22 → Boss-Extrude11 (add)
    with BuildSketch(Plane(origin=(42.5, 0, 0), x_dir=(0, 0, -1), z_dir=(1, 0, 0))):
        with Locations((-13, 117.5)):
            Circle(SKETCH22_R)
    boss_extrude11 = extrude(amount=BOSS_EXTRUDE11_DEPTH, taper=BOSS_EXTRUDE11_TAPER)

    # Mirror8: Boss-Extrude11 across plane
    add(boss_extrude11.mirror(Plane(origin=(45, 117.5, 13), x_dir=(0, 0, 1), z_dir=(1, 0, 0))))

    # Sketch23 → Cut-Extrude7 (cut)
    with BuildSketch(Plane(origin=(50, 0, 0), x_dir=(0, 0, -1), z_dir=(1, 0, 0))):
        with Locations((-13, 117.5)):
            Circle(SKETCH23_R)
    extrude(amount=-CUT_EXTRUDE7_DEPTH, mode=Mode.SUBTRACT)

    # Sketch27 → Cut-Extrude9 (cut, up to next)
    with BuildSketch(Plane(origin=(0, 115, 0), x_dir=(1, 0, 0), z_dir=(0, 1, 0)), mode=Mode.PRIVATE) as cut_extrude9_sk1:
        with Locations((45, -13)):
            Rectangle(SKETCH27_W, SKETCH27_H)
    cut_extrude9_tool1 = extrude(cut_extrude9_sk1.sketch, amount=-CUT_EXTRUDE9_REACH, mode=Mode.PRIVATE) & part_2.part
    add(cut_extrude9_tool1.solids().sort_by_distance((45, 115, 13))[0], mode=Mode.SUBTRACT)

    # Sketch10 → Boss-Extrude6 (add)
    with BuildSketch(Plane(origin=(0, 110, 0), x_dir=(1, 0, 0), z_dir=(0, 1, 0))):
        with Locations((19.25, -13)):
            Rectangle(SKETCH10_W, SKETCH10_H)
        with Locations((26.75, -13)):
            Rectangle(SKETCH10_W, SKETCH10_H)
    extrude(amount=BOSS_EXTRUDE6_DEPTH)

    # Fillet6
    fillet6_edges = [part_2.edges().sort_by_distance(p)[0] for p in [
        (19.25, 115, 18),
        (19.25, 115, 8),
        (26.75, 115, 8),
        (26.75, 115, 18),
    ]]
    fillet(fillet6_edges, radius=FILLET6_R - 0.0001)  # a hair under: the kernel refuses the full size

    # Sketch28 → Boss-Extrude12 (add)
    with BuildSketch(Plane(origin=(20.5, 0, 0), x_dir=(0, 0, -1), z_dir=(1, 0, 0))):
        with Locations((-13, 112.5)):
            Circle(SKETCH28_R)
    boss_extrude12 = extrude(amount=BOSS_EXTRUDE12_DEPTH, taper=BOSS_EXTRUDE12_TAPER)

    # Mirror9: Boss-Extrude12 across plane
    add(boss_extrude12.mirror(Plane(origin=(23, 112.5, 13), x_dir=(0, 0, 1), z_dir=(1, 0, 0))))

    # Sketch29 → Cut-Extrude10 (cut)
    with BuildSketch(Plane(origin=(28, 0, 0), x_dir=(0, 0, -1), z_dir=(1, 0, 0))):
        with Locations((-13, 112.5)):
            Circle(SKETCH29_R)
    extrude(amount=-CUT_EXTRUDE10_DEPTH, mode=Mode.SUBTRACT)

    # Sketch30 → Cut-Extrude11 (cut)
    with BuildSketch(Plane(origin=(0, 110, 0), x_dir=(1, 0, 0), z_dir=(0, 1, 0))):
        with Locations((23, -13)):
            Rectangle(SKETCH30_W, SKETCH30_H)
    extrude(amount=-CUT_EXTRUDE11_DEPTH, mode=Mode.SUBTRACT)

    # Sketch13 → Boss-Extrude8 (add)
    with BuildSketch(Plane(origin=(0, 105, 0), x_dir=(1, 0, 0), z_dir=(0, 1, 0))):
        with Locations((-2.75, -13)):
            Rectangle(SKETCH13_W, SKETCH13_H)
        with Locations((4.75, -13)):
            Rectangle(SKETCH13_W, SKETCH13_H)
    extrude(amount=BOSS_EXTRUDE8_DEPTH)

    # Fillet8
    fillet8_edges = [part_2.edges().sort_by_distance(p)[0] for p in [
        (-2.75, 110, 18),
        (-2.75, 110, 8),
        (4.75, 110, 8),
        (4.75, 110, 18),
    ]]
    fillet(fillet8_edges, radius=FILLET8_R - 0.0001)  # a hair under: the kernel refuses the full size

    # Sketch31 → Boss-Extrude13 (add)
    with BuildSketch(Plane(origin=(-1.5, 0, 0), x_dir=(0, 0, -1), z_dir=(1, 0, 0))):
        with Locations((-13, 107.5)):
            Circle(SKETCH31_R)
    boss_extrude13 = extrude(amount=BOSS_EXTRUDE13_DEPTH, taper=BOSS_EXTRUDE13_TAPER)

    # Mirror10: Boss-Extrude13 across plane
    add(boss_extrude13.mirror(Plane(origin=(1, 107.5, 13), x_dir=(0, 0, 1), z_dir=(1, 0, 0))))

    # Sketch32 → Cut-Extrude12 (cut)
    with BuildSketch(Plane(origin=(6, 0, 0), x_dir=(0, 0, -1), z_dir=(1, 0, 0))):
        with Locations((-13, 107.5)):
            Circle(SKETCH32_R)
    extrude(amount=-CUT_EXTRUDE12_DEPTH, mode=Mode.SUBTRACT)

    # Sketch33 → Cut-Extrude13 (cut)
    with BuildSketch(Plane(origin=(0, 105, 0), x_dir=(1, 0, 0), z_dir=(0, 1, 0))):
        with Locations((1, -13)):
            Rectangle(SKETCH33_W, SKETCH33_H)
    extrude(amount=-CUT_EXTRUDE13_DEPTH, mode=Mode.SUBTRACT)


solid = part_2.part
